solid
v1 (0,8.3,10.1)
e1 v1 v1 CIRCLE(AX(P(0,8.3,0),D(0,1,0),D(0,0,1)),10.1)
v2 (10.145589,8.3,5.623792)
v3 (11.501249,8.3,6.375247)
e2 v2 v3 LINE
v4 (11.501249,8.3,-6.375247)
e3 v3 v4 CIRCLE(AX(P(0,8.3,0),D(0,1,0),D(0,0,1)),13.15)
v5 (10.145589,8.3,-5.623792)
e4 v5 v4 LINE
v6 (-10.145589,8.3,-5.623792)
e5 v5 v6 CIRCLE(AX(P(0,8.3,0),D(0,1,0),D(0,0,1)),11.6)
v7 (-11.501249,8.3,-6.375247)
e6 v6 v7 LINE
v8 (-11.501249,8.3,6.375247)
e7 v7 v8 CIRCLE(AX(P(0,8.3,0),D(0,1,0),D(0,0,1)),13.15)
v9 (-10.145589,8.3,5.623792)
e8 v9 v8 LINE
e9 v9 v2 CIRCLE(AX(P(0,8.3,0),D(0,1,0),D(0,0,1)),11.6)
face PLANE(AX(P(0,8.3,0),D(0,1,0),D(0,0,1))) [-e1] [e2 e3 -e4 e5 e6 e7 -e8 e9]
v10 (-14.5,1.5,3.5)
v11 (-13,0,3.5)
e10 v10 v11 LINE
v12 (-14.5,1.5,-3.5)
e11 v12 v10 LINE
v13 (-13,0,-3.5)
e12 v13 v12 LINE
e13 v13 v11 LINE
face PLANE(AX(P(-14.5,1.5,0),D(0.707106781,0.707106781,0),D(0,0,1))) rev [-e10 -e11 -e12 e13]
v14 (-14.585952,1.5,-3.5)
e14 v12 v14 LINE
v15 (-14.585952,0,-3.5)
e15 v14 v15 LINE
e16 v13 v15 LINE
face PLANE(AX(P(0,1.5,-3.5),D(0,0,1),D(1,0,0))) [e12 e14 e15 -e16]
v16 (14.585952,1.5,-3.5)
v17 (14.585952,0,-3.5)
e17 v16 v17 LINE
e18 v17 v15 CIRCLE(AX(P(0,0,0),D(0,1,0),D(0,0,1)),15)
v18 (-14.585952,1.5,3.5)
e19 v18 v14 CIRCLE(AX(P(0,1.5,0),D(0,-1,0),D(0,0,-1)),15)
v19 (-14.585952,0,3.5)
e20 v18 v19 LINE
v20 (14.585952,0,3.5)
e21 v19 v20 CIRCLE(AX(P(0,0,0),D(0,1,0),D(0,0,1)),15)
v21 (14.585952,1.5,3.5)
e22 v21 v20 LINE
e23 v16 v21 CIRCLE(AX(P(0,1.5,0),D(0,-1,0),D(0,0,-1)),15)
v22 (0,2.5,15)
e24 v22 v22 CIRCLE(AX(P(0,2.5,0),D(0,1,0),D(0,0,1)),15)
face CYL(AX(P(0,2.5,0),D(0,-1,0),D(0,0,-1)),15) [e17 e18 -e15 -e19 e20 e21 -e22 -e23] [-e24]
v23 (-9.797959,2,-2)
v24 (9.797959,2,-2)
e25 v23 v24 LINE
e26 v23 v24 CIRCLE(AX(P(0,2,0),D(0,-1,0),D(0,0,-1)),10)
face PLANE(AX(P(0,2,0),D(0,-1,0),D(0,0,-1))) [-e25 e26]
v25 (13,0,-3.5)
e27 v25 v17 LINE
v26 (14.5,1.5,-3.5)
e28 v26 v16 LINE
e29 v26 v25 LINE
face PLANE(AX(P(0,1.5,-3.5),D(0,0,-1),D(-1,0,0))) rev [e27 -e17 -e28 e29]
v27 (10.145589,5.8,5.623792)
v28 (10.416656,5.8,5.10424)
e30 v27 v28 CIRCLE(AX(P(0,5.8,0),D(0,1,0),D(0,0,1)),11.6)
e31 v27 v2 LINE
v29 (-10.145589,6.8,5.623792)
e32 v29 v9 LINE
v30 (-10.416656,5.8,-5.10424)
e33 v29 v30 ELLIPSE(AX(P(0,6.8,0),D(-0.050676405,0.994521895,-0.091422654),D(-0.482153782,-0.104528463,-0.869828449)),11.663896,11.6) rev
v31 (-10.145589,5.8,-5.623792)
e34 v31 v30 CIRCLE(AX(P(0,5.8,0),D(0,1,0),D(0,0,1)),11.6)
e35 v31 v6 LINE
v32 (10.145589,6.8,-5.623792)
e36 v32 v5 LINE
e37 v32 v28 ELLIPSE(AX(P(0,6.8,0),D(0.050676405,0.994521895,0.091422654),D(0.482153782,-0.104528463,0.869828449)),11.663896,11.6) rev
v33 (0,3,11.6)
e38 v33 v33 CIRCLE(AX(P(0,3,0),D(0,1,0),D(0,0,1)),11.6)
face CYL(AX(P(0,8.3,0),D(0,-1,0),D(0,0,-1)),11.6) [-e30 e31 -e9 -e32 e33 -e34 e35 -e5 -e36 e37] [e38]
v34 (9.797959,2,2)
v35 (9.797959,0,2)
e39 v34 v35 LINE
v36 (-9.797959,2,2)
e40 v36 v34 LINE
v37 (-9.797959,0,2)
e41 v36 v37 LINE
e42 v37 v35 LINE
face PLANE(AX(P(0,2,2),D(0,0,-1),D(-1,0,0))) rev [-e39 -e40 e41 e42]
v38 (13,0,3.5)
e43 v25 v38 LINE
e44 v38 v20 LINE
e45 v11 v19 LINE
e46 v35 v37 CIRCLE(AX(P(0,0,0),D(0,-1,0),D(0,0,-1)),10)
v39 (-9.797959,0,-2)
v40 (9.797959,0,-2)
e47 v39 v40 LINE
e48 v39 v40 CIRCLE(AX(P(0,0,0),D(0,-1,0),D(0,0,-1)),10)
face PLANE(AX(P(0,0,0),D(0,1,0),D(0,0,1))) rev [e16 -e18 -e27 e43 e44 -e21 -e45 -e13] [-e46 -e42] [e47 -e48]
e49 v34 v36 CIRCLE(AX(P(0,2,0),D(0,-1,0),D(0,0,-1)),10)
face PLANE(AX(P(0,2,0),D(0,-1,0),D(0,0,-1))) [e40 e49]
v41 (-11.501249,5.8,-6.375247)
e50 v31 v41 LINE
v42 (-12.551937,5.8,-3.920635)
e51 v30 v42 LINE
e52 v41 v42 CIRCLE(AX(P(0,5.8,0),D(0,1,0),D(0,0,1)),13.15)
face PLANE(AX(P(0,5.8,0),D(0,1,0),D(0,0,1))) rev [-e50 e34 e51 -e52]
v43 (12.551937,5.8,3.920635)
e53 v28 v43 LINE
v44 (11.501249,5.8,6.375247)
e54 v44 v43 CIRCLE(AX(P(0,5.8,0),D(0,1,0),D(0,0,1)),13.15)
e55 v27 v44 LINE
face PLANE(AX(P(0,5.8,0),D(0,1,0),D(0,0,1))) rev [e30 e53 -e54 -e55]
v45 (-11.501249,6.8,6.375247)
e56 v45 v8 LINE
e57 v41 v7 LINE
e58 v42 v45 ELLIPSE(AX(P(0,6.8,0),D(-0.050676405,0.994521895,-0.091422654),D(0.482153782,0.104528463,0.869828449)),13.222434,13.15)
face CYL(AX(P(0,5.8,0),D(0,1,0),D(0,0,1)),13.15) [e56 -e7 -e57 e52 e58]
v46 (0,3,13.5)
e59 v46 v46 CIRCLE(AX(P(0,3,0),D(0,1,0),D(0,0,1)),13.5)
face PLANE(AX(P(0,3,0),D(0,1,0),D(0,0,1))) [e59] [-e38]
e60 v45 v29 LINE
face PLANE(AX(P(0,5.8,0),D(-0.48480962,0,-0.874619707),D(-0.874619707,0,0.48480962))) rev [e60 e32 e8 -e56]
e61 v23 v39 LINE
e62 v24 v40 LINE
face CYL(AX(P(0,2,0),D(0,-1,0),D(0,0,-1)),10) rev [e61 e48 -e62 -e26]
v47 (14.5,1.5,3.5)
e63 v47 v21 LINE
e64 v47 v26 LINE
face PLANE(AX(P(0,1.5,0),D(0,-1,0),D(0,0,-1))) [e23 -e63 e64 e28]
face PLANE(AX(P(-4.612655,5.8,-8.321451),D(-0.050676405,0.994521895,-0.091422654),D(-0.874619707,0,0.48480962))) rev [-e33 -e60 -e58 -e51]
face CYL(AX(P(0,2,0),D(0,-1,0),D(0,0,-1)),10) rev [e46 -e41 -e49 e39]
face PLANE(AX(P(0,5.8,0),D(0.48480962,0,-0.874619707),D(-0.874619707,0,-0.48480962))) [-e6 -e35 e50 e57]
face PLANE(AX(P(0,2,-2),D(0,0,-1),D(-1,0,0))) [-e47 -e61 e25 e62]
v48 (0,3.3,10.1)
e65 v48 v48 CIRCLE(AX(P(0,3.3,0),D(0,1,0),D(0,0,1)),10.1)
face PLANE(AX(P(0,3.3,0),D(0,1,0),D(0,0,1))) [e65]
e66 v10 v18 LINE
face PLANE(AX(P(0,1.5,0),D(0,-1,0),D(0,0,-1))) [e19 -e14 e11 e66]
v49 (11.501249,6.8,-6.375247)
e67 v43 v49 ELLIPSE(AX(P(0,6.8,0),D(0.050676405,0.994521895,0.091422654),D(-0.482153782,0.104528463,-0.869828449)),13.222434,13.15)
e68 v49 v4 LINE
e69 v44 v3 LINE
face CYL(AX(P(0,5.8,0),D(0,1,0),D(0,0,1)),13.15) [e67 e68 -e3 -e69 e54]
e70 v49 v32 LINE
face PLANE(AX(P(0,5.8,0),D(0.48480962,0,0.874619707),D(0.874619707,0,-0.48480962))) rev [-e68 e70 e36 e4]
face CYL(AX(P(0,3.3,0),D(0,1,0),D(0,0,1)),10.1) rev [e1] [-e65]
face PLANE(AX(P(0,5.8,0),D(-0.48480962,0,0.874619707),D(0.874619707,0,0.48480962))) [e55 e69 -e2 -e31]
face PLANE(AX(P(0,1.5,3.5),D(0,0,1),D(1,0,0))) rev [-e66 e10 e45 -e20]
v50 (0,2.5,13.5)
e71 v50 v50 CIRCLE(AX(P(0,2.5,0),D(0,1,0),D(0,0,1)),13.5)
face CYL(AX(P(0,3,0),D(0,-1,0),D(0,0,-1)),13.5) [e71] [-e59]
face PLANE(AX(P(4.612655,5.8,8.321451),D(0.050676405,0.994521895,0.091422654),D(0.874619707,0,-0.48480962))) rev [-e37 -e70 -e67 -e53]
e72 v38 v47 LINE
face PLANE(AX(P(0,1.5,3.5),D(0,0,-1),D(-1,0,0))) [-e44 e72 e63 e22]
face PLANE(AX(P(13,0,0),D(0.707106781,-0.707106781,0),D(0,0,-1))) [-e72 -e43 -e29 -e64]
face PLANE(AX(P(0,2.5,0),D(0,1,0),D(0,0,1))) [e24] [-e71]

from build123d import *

# Parameters (mm, degrees)
SKETCH1_R           = 15
BOSS_EXTRUDE1_DEPTH = 2.5
SKETCH2_R           = 13.5
BOSS_EXTRUDE2_DEPTH = 0.5
SKETCH3_R           = 11.6
BOSS_EXTRUDE3_DEPTH = 5.3
SKETCH4_R           = 10.1
CUT_EXTRUDE1_DEPTH  = 5
CUT_EXTRUDE2_DEPTH  = 2
BOSS_EXTRUDE4_START = -2.5
BOSS_EXTRUDE4_DEPTH = 2.5
CUT_EXTRUDE3_DEPTH  = 1.5
CHAMFER1_SIZE       = 1.5
CHAMFER3_SIZE       = 1
CHAMFER3_SIZE_2     = 9.514364454


# Some blends are built 0.0001 mm under size
with BuildPart() as part:
    # Sketch1 → Boss-Extrude1 (new body)
    with BuildSketch(Plane(origin=(0, 0, 0), x_dir=(1, 0, 0), z_dir=(0, 1, 0))):
        with Locations(Location((0, 0, 0), (0, 0, 270))):
            Circle(SKETCH1_R)
    extrude(amount=BOSS_EXTRUDE1_DEPTH)

    # Sketch2 → Boss-Extrude2 (add)
    with BuildSketch(Plane(origin=(0, 2.5, 0), x_dir=(1, 0, 0), z_dir=(0, 1, 0))):
        with Locations(Location((0, 0, 0), (0, 0, 270))):
            Circle(SKETCH2_R)
    extrude(amount=BOSS_EXTRUDE2_DEPTH)

    # Sketch3 → Boss-Extrude3 (add)
    with BuildSketch(Plane(origin=(0, 3, 0), x_dir=(1, 0, 0), z_dir=(0, 1, 0))):
        with Locations(Location((0, 0, 0), (0, 0, 270))):
            Circle(SKETCH3_R)
    extrude(amount=BOSS_EXTRUDE3_DEPTH)

    # Sketch4 → Cut-Extrude1 (cut)
    with BuildSketch(Plane(origin=(0, 8.3, 0), x_dir=(1, 0, 0), z_dir=(0, 1, 0))):
        with Locations(Location((0, 0, 0), (0, 0, 270))):
            Circle(SKETCH4_R)
    extrude(amount=-CUT_EXTRUDE1_DEPTH, mode=Mode.SUBTRACT)

    # Sketch6 → Cut-Extrude2 (cut)
    with BuildSketch(Plane.XZ):
        with BuildLine():
            ThreePointArc((9.797958971, 2), (0, 10), (-9.797958971, 2))
            Line((-9.797958971, 2), (9.797958971, 2))
        make_face()
        with BuildLine():
            Line((9.797958971, -2), (-9.797958971, -2))
            ThreePointArc((-9.797958971, -2), (0, -10), (9.797958971, -2))
        make_face()
    extrude(amount=-CUT_EXTRUDE2_DEPTH, mode=Mode.SUBTRACT)

    # Sketch7 → Boss-Extrude4 (add)
    with BuildSketch(Plane(origin=(0, 8.3, 0), x_dir=(1, 0, 0), z_dir=(0, 1, 0)).offset(BOSS_EXTRUDE4_START)):
        with BuildLine():
            ThreePointArc((11.6, 0), (11.230512628, -2.904408047), (10.145588603, -5.623791595))
            Line((10.145588603, -5.623791595), (11.501249149, -6.375246506))
            ThreePointArc((11.501249149, -6.375246506), (12.731141471, -3.292497053), (13.15, 0))
            ThreePointArc((13.15, 0), (12.731141471, 3.292497053), (11.501249149, 6.375246506))
            Line((11.501249149, 6.375246506), (10.145588603, 5.623791595))
            ThreePointArc((10.145588603, 5.623791595), (11.230512628, 2.904408047), (11.6, 0))
        make_face()
        with BuildLine():
            Line((-11.501249149, -6.375246506), (-10.145588603, -5.623791595))
            ThreePointArc((-10.145588603, -5.623791595), (-11.6, 0), (-10.145588603, 5.623791595))
            Line((-10.145588603, 5.623791595), (-11.501249149, 6.375246506))
            ThreePointArc((-11.501249149, 6.375246506), (-13.15, 0), (-11.501249149, -6.375246506))
        make_face()
    extrude(amount=BOSS_EXTRUDE4_DEPTH)

    # Sketch8 → Cut-Extrude3 (cut)
    with BuildSketch(Plane.XZ):
        with BuildLine():
            Line((13, 3.5), (13, -3.5))
            Line((13, -3.5), (14.585952146, -3.5))
            ThreePointArc((14.585952146, -3.5), (14.896128393, -1.762202856), (15, 0))
            ThreePointArc((15, 0), (14.896128393, 1.762202856), (14.585952146, 3.5))
            Line((14.585952146, 3.5), (13, 3.5))
        make_face()
        with BuildLine():
            ThreePointArc((-14.585952146, 3.5), (-15, 0), (-14.585952146, -3.5))
            Line((-14.585952146, -3.5), (-13, -3.5))
            Line((-13, -3.5), (-13, 3.5))
            Line((-13, 3.5), (-14.585952146, 3.5))
        make_face()
    extrude(amount=-CUT_EXTRUDE3_DEPTH, mode=Mode.SUBTRACT)

    # Chamfer1
    chamfer1_edges = [part.edges().sort_by_distance(p)[0] for p in [
        (13, 1.5, 0),
        (-13, 1.5, 0),
    ]]
    chamfer(chamfer1_edges, length=CHAMFER1_SIZE - 0.0001)  # a hair under: the kernel refuses the full size

    # Chamfer3
    # the kernel refuses this chamfer: 9.514364454, 1 mm, written as the material it takes off along each edge
    with BuildSketch(Plane(origin=(33.132637154, 5.8, -18.365720673), x_dir=(-0.1658303097717397, 0.9396808679591152, -0.29916579809967064), z_dir=(-0.874619707139395, 0, 0.4848096202463386))) as chamfer3_piece_1_section:
        Polygon((CHAMFER3_SIZE * 0.939680867959, -CHAMFER3_SIZE * 0.342052432226), (-CHAMFER3_SIZE_2 * 0.342052432234, -CHAMFER3_SIZE_2 * 0.939680867981), (0, 0), align=None)
    chamfer3_piece_1 = extrude(amount=51.014670938, mode=Mode.PRIVATE)
    chamfer3_piece_1 = chamfer3_piece_1 - Plane(origin=(0, 6.124739453, 0), x_dir=(0, 0, 1), z_dir=(0, -1, 0)) * Cylinder(11.6, 138, mode=Mode.PRIVATE)
    add(chamfer3_piece_1, mode=Mode.SUBTRACT)
    with BuildSketch(Plane(origin=(-33.132637154, 5.8, 18.365720673), x_dir=(0.16583030977173743, 0.9396808679591152, 0.2991657980996716), z_dir=(0.8746197071393984, 0, -0.48480962024633234))) as chamfer3_piece_2_section:
        Polygon((CHAMFER3_SIZE * 0.939680867959, -CHAMFER3_SIZE * 0.342052432226), (-CHAMFER3_SIZE_2 * 0.342052432234, -CHAMFER3_SIZE_2 * 0.939680867981), (0, 0), align=None)
    chamfer3_piece_2 = extrude(amount=51.014670938, mode=Mode.PRIVATE)
    chamfer3_piece_2 = chamfer3_piece_2 - Plane(origin=(0, 6.124739453, 0), x_dir=(0, 0, 1), z_dir=(0, -1, 0)) * Cylinder(11.6, 138, mode=Mode.PRIVATE)
    add(chamfer3_piece_2, mode=Mode.SUBTRACT)


solid = part.part
